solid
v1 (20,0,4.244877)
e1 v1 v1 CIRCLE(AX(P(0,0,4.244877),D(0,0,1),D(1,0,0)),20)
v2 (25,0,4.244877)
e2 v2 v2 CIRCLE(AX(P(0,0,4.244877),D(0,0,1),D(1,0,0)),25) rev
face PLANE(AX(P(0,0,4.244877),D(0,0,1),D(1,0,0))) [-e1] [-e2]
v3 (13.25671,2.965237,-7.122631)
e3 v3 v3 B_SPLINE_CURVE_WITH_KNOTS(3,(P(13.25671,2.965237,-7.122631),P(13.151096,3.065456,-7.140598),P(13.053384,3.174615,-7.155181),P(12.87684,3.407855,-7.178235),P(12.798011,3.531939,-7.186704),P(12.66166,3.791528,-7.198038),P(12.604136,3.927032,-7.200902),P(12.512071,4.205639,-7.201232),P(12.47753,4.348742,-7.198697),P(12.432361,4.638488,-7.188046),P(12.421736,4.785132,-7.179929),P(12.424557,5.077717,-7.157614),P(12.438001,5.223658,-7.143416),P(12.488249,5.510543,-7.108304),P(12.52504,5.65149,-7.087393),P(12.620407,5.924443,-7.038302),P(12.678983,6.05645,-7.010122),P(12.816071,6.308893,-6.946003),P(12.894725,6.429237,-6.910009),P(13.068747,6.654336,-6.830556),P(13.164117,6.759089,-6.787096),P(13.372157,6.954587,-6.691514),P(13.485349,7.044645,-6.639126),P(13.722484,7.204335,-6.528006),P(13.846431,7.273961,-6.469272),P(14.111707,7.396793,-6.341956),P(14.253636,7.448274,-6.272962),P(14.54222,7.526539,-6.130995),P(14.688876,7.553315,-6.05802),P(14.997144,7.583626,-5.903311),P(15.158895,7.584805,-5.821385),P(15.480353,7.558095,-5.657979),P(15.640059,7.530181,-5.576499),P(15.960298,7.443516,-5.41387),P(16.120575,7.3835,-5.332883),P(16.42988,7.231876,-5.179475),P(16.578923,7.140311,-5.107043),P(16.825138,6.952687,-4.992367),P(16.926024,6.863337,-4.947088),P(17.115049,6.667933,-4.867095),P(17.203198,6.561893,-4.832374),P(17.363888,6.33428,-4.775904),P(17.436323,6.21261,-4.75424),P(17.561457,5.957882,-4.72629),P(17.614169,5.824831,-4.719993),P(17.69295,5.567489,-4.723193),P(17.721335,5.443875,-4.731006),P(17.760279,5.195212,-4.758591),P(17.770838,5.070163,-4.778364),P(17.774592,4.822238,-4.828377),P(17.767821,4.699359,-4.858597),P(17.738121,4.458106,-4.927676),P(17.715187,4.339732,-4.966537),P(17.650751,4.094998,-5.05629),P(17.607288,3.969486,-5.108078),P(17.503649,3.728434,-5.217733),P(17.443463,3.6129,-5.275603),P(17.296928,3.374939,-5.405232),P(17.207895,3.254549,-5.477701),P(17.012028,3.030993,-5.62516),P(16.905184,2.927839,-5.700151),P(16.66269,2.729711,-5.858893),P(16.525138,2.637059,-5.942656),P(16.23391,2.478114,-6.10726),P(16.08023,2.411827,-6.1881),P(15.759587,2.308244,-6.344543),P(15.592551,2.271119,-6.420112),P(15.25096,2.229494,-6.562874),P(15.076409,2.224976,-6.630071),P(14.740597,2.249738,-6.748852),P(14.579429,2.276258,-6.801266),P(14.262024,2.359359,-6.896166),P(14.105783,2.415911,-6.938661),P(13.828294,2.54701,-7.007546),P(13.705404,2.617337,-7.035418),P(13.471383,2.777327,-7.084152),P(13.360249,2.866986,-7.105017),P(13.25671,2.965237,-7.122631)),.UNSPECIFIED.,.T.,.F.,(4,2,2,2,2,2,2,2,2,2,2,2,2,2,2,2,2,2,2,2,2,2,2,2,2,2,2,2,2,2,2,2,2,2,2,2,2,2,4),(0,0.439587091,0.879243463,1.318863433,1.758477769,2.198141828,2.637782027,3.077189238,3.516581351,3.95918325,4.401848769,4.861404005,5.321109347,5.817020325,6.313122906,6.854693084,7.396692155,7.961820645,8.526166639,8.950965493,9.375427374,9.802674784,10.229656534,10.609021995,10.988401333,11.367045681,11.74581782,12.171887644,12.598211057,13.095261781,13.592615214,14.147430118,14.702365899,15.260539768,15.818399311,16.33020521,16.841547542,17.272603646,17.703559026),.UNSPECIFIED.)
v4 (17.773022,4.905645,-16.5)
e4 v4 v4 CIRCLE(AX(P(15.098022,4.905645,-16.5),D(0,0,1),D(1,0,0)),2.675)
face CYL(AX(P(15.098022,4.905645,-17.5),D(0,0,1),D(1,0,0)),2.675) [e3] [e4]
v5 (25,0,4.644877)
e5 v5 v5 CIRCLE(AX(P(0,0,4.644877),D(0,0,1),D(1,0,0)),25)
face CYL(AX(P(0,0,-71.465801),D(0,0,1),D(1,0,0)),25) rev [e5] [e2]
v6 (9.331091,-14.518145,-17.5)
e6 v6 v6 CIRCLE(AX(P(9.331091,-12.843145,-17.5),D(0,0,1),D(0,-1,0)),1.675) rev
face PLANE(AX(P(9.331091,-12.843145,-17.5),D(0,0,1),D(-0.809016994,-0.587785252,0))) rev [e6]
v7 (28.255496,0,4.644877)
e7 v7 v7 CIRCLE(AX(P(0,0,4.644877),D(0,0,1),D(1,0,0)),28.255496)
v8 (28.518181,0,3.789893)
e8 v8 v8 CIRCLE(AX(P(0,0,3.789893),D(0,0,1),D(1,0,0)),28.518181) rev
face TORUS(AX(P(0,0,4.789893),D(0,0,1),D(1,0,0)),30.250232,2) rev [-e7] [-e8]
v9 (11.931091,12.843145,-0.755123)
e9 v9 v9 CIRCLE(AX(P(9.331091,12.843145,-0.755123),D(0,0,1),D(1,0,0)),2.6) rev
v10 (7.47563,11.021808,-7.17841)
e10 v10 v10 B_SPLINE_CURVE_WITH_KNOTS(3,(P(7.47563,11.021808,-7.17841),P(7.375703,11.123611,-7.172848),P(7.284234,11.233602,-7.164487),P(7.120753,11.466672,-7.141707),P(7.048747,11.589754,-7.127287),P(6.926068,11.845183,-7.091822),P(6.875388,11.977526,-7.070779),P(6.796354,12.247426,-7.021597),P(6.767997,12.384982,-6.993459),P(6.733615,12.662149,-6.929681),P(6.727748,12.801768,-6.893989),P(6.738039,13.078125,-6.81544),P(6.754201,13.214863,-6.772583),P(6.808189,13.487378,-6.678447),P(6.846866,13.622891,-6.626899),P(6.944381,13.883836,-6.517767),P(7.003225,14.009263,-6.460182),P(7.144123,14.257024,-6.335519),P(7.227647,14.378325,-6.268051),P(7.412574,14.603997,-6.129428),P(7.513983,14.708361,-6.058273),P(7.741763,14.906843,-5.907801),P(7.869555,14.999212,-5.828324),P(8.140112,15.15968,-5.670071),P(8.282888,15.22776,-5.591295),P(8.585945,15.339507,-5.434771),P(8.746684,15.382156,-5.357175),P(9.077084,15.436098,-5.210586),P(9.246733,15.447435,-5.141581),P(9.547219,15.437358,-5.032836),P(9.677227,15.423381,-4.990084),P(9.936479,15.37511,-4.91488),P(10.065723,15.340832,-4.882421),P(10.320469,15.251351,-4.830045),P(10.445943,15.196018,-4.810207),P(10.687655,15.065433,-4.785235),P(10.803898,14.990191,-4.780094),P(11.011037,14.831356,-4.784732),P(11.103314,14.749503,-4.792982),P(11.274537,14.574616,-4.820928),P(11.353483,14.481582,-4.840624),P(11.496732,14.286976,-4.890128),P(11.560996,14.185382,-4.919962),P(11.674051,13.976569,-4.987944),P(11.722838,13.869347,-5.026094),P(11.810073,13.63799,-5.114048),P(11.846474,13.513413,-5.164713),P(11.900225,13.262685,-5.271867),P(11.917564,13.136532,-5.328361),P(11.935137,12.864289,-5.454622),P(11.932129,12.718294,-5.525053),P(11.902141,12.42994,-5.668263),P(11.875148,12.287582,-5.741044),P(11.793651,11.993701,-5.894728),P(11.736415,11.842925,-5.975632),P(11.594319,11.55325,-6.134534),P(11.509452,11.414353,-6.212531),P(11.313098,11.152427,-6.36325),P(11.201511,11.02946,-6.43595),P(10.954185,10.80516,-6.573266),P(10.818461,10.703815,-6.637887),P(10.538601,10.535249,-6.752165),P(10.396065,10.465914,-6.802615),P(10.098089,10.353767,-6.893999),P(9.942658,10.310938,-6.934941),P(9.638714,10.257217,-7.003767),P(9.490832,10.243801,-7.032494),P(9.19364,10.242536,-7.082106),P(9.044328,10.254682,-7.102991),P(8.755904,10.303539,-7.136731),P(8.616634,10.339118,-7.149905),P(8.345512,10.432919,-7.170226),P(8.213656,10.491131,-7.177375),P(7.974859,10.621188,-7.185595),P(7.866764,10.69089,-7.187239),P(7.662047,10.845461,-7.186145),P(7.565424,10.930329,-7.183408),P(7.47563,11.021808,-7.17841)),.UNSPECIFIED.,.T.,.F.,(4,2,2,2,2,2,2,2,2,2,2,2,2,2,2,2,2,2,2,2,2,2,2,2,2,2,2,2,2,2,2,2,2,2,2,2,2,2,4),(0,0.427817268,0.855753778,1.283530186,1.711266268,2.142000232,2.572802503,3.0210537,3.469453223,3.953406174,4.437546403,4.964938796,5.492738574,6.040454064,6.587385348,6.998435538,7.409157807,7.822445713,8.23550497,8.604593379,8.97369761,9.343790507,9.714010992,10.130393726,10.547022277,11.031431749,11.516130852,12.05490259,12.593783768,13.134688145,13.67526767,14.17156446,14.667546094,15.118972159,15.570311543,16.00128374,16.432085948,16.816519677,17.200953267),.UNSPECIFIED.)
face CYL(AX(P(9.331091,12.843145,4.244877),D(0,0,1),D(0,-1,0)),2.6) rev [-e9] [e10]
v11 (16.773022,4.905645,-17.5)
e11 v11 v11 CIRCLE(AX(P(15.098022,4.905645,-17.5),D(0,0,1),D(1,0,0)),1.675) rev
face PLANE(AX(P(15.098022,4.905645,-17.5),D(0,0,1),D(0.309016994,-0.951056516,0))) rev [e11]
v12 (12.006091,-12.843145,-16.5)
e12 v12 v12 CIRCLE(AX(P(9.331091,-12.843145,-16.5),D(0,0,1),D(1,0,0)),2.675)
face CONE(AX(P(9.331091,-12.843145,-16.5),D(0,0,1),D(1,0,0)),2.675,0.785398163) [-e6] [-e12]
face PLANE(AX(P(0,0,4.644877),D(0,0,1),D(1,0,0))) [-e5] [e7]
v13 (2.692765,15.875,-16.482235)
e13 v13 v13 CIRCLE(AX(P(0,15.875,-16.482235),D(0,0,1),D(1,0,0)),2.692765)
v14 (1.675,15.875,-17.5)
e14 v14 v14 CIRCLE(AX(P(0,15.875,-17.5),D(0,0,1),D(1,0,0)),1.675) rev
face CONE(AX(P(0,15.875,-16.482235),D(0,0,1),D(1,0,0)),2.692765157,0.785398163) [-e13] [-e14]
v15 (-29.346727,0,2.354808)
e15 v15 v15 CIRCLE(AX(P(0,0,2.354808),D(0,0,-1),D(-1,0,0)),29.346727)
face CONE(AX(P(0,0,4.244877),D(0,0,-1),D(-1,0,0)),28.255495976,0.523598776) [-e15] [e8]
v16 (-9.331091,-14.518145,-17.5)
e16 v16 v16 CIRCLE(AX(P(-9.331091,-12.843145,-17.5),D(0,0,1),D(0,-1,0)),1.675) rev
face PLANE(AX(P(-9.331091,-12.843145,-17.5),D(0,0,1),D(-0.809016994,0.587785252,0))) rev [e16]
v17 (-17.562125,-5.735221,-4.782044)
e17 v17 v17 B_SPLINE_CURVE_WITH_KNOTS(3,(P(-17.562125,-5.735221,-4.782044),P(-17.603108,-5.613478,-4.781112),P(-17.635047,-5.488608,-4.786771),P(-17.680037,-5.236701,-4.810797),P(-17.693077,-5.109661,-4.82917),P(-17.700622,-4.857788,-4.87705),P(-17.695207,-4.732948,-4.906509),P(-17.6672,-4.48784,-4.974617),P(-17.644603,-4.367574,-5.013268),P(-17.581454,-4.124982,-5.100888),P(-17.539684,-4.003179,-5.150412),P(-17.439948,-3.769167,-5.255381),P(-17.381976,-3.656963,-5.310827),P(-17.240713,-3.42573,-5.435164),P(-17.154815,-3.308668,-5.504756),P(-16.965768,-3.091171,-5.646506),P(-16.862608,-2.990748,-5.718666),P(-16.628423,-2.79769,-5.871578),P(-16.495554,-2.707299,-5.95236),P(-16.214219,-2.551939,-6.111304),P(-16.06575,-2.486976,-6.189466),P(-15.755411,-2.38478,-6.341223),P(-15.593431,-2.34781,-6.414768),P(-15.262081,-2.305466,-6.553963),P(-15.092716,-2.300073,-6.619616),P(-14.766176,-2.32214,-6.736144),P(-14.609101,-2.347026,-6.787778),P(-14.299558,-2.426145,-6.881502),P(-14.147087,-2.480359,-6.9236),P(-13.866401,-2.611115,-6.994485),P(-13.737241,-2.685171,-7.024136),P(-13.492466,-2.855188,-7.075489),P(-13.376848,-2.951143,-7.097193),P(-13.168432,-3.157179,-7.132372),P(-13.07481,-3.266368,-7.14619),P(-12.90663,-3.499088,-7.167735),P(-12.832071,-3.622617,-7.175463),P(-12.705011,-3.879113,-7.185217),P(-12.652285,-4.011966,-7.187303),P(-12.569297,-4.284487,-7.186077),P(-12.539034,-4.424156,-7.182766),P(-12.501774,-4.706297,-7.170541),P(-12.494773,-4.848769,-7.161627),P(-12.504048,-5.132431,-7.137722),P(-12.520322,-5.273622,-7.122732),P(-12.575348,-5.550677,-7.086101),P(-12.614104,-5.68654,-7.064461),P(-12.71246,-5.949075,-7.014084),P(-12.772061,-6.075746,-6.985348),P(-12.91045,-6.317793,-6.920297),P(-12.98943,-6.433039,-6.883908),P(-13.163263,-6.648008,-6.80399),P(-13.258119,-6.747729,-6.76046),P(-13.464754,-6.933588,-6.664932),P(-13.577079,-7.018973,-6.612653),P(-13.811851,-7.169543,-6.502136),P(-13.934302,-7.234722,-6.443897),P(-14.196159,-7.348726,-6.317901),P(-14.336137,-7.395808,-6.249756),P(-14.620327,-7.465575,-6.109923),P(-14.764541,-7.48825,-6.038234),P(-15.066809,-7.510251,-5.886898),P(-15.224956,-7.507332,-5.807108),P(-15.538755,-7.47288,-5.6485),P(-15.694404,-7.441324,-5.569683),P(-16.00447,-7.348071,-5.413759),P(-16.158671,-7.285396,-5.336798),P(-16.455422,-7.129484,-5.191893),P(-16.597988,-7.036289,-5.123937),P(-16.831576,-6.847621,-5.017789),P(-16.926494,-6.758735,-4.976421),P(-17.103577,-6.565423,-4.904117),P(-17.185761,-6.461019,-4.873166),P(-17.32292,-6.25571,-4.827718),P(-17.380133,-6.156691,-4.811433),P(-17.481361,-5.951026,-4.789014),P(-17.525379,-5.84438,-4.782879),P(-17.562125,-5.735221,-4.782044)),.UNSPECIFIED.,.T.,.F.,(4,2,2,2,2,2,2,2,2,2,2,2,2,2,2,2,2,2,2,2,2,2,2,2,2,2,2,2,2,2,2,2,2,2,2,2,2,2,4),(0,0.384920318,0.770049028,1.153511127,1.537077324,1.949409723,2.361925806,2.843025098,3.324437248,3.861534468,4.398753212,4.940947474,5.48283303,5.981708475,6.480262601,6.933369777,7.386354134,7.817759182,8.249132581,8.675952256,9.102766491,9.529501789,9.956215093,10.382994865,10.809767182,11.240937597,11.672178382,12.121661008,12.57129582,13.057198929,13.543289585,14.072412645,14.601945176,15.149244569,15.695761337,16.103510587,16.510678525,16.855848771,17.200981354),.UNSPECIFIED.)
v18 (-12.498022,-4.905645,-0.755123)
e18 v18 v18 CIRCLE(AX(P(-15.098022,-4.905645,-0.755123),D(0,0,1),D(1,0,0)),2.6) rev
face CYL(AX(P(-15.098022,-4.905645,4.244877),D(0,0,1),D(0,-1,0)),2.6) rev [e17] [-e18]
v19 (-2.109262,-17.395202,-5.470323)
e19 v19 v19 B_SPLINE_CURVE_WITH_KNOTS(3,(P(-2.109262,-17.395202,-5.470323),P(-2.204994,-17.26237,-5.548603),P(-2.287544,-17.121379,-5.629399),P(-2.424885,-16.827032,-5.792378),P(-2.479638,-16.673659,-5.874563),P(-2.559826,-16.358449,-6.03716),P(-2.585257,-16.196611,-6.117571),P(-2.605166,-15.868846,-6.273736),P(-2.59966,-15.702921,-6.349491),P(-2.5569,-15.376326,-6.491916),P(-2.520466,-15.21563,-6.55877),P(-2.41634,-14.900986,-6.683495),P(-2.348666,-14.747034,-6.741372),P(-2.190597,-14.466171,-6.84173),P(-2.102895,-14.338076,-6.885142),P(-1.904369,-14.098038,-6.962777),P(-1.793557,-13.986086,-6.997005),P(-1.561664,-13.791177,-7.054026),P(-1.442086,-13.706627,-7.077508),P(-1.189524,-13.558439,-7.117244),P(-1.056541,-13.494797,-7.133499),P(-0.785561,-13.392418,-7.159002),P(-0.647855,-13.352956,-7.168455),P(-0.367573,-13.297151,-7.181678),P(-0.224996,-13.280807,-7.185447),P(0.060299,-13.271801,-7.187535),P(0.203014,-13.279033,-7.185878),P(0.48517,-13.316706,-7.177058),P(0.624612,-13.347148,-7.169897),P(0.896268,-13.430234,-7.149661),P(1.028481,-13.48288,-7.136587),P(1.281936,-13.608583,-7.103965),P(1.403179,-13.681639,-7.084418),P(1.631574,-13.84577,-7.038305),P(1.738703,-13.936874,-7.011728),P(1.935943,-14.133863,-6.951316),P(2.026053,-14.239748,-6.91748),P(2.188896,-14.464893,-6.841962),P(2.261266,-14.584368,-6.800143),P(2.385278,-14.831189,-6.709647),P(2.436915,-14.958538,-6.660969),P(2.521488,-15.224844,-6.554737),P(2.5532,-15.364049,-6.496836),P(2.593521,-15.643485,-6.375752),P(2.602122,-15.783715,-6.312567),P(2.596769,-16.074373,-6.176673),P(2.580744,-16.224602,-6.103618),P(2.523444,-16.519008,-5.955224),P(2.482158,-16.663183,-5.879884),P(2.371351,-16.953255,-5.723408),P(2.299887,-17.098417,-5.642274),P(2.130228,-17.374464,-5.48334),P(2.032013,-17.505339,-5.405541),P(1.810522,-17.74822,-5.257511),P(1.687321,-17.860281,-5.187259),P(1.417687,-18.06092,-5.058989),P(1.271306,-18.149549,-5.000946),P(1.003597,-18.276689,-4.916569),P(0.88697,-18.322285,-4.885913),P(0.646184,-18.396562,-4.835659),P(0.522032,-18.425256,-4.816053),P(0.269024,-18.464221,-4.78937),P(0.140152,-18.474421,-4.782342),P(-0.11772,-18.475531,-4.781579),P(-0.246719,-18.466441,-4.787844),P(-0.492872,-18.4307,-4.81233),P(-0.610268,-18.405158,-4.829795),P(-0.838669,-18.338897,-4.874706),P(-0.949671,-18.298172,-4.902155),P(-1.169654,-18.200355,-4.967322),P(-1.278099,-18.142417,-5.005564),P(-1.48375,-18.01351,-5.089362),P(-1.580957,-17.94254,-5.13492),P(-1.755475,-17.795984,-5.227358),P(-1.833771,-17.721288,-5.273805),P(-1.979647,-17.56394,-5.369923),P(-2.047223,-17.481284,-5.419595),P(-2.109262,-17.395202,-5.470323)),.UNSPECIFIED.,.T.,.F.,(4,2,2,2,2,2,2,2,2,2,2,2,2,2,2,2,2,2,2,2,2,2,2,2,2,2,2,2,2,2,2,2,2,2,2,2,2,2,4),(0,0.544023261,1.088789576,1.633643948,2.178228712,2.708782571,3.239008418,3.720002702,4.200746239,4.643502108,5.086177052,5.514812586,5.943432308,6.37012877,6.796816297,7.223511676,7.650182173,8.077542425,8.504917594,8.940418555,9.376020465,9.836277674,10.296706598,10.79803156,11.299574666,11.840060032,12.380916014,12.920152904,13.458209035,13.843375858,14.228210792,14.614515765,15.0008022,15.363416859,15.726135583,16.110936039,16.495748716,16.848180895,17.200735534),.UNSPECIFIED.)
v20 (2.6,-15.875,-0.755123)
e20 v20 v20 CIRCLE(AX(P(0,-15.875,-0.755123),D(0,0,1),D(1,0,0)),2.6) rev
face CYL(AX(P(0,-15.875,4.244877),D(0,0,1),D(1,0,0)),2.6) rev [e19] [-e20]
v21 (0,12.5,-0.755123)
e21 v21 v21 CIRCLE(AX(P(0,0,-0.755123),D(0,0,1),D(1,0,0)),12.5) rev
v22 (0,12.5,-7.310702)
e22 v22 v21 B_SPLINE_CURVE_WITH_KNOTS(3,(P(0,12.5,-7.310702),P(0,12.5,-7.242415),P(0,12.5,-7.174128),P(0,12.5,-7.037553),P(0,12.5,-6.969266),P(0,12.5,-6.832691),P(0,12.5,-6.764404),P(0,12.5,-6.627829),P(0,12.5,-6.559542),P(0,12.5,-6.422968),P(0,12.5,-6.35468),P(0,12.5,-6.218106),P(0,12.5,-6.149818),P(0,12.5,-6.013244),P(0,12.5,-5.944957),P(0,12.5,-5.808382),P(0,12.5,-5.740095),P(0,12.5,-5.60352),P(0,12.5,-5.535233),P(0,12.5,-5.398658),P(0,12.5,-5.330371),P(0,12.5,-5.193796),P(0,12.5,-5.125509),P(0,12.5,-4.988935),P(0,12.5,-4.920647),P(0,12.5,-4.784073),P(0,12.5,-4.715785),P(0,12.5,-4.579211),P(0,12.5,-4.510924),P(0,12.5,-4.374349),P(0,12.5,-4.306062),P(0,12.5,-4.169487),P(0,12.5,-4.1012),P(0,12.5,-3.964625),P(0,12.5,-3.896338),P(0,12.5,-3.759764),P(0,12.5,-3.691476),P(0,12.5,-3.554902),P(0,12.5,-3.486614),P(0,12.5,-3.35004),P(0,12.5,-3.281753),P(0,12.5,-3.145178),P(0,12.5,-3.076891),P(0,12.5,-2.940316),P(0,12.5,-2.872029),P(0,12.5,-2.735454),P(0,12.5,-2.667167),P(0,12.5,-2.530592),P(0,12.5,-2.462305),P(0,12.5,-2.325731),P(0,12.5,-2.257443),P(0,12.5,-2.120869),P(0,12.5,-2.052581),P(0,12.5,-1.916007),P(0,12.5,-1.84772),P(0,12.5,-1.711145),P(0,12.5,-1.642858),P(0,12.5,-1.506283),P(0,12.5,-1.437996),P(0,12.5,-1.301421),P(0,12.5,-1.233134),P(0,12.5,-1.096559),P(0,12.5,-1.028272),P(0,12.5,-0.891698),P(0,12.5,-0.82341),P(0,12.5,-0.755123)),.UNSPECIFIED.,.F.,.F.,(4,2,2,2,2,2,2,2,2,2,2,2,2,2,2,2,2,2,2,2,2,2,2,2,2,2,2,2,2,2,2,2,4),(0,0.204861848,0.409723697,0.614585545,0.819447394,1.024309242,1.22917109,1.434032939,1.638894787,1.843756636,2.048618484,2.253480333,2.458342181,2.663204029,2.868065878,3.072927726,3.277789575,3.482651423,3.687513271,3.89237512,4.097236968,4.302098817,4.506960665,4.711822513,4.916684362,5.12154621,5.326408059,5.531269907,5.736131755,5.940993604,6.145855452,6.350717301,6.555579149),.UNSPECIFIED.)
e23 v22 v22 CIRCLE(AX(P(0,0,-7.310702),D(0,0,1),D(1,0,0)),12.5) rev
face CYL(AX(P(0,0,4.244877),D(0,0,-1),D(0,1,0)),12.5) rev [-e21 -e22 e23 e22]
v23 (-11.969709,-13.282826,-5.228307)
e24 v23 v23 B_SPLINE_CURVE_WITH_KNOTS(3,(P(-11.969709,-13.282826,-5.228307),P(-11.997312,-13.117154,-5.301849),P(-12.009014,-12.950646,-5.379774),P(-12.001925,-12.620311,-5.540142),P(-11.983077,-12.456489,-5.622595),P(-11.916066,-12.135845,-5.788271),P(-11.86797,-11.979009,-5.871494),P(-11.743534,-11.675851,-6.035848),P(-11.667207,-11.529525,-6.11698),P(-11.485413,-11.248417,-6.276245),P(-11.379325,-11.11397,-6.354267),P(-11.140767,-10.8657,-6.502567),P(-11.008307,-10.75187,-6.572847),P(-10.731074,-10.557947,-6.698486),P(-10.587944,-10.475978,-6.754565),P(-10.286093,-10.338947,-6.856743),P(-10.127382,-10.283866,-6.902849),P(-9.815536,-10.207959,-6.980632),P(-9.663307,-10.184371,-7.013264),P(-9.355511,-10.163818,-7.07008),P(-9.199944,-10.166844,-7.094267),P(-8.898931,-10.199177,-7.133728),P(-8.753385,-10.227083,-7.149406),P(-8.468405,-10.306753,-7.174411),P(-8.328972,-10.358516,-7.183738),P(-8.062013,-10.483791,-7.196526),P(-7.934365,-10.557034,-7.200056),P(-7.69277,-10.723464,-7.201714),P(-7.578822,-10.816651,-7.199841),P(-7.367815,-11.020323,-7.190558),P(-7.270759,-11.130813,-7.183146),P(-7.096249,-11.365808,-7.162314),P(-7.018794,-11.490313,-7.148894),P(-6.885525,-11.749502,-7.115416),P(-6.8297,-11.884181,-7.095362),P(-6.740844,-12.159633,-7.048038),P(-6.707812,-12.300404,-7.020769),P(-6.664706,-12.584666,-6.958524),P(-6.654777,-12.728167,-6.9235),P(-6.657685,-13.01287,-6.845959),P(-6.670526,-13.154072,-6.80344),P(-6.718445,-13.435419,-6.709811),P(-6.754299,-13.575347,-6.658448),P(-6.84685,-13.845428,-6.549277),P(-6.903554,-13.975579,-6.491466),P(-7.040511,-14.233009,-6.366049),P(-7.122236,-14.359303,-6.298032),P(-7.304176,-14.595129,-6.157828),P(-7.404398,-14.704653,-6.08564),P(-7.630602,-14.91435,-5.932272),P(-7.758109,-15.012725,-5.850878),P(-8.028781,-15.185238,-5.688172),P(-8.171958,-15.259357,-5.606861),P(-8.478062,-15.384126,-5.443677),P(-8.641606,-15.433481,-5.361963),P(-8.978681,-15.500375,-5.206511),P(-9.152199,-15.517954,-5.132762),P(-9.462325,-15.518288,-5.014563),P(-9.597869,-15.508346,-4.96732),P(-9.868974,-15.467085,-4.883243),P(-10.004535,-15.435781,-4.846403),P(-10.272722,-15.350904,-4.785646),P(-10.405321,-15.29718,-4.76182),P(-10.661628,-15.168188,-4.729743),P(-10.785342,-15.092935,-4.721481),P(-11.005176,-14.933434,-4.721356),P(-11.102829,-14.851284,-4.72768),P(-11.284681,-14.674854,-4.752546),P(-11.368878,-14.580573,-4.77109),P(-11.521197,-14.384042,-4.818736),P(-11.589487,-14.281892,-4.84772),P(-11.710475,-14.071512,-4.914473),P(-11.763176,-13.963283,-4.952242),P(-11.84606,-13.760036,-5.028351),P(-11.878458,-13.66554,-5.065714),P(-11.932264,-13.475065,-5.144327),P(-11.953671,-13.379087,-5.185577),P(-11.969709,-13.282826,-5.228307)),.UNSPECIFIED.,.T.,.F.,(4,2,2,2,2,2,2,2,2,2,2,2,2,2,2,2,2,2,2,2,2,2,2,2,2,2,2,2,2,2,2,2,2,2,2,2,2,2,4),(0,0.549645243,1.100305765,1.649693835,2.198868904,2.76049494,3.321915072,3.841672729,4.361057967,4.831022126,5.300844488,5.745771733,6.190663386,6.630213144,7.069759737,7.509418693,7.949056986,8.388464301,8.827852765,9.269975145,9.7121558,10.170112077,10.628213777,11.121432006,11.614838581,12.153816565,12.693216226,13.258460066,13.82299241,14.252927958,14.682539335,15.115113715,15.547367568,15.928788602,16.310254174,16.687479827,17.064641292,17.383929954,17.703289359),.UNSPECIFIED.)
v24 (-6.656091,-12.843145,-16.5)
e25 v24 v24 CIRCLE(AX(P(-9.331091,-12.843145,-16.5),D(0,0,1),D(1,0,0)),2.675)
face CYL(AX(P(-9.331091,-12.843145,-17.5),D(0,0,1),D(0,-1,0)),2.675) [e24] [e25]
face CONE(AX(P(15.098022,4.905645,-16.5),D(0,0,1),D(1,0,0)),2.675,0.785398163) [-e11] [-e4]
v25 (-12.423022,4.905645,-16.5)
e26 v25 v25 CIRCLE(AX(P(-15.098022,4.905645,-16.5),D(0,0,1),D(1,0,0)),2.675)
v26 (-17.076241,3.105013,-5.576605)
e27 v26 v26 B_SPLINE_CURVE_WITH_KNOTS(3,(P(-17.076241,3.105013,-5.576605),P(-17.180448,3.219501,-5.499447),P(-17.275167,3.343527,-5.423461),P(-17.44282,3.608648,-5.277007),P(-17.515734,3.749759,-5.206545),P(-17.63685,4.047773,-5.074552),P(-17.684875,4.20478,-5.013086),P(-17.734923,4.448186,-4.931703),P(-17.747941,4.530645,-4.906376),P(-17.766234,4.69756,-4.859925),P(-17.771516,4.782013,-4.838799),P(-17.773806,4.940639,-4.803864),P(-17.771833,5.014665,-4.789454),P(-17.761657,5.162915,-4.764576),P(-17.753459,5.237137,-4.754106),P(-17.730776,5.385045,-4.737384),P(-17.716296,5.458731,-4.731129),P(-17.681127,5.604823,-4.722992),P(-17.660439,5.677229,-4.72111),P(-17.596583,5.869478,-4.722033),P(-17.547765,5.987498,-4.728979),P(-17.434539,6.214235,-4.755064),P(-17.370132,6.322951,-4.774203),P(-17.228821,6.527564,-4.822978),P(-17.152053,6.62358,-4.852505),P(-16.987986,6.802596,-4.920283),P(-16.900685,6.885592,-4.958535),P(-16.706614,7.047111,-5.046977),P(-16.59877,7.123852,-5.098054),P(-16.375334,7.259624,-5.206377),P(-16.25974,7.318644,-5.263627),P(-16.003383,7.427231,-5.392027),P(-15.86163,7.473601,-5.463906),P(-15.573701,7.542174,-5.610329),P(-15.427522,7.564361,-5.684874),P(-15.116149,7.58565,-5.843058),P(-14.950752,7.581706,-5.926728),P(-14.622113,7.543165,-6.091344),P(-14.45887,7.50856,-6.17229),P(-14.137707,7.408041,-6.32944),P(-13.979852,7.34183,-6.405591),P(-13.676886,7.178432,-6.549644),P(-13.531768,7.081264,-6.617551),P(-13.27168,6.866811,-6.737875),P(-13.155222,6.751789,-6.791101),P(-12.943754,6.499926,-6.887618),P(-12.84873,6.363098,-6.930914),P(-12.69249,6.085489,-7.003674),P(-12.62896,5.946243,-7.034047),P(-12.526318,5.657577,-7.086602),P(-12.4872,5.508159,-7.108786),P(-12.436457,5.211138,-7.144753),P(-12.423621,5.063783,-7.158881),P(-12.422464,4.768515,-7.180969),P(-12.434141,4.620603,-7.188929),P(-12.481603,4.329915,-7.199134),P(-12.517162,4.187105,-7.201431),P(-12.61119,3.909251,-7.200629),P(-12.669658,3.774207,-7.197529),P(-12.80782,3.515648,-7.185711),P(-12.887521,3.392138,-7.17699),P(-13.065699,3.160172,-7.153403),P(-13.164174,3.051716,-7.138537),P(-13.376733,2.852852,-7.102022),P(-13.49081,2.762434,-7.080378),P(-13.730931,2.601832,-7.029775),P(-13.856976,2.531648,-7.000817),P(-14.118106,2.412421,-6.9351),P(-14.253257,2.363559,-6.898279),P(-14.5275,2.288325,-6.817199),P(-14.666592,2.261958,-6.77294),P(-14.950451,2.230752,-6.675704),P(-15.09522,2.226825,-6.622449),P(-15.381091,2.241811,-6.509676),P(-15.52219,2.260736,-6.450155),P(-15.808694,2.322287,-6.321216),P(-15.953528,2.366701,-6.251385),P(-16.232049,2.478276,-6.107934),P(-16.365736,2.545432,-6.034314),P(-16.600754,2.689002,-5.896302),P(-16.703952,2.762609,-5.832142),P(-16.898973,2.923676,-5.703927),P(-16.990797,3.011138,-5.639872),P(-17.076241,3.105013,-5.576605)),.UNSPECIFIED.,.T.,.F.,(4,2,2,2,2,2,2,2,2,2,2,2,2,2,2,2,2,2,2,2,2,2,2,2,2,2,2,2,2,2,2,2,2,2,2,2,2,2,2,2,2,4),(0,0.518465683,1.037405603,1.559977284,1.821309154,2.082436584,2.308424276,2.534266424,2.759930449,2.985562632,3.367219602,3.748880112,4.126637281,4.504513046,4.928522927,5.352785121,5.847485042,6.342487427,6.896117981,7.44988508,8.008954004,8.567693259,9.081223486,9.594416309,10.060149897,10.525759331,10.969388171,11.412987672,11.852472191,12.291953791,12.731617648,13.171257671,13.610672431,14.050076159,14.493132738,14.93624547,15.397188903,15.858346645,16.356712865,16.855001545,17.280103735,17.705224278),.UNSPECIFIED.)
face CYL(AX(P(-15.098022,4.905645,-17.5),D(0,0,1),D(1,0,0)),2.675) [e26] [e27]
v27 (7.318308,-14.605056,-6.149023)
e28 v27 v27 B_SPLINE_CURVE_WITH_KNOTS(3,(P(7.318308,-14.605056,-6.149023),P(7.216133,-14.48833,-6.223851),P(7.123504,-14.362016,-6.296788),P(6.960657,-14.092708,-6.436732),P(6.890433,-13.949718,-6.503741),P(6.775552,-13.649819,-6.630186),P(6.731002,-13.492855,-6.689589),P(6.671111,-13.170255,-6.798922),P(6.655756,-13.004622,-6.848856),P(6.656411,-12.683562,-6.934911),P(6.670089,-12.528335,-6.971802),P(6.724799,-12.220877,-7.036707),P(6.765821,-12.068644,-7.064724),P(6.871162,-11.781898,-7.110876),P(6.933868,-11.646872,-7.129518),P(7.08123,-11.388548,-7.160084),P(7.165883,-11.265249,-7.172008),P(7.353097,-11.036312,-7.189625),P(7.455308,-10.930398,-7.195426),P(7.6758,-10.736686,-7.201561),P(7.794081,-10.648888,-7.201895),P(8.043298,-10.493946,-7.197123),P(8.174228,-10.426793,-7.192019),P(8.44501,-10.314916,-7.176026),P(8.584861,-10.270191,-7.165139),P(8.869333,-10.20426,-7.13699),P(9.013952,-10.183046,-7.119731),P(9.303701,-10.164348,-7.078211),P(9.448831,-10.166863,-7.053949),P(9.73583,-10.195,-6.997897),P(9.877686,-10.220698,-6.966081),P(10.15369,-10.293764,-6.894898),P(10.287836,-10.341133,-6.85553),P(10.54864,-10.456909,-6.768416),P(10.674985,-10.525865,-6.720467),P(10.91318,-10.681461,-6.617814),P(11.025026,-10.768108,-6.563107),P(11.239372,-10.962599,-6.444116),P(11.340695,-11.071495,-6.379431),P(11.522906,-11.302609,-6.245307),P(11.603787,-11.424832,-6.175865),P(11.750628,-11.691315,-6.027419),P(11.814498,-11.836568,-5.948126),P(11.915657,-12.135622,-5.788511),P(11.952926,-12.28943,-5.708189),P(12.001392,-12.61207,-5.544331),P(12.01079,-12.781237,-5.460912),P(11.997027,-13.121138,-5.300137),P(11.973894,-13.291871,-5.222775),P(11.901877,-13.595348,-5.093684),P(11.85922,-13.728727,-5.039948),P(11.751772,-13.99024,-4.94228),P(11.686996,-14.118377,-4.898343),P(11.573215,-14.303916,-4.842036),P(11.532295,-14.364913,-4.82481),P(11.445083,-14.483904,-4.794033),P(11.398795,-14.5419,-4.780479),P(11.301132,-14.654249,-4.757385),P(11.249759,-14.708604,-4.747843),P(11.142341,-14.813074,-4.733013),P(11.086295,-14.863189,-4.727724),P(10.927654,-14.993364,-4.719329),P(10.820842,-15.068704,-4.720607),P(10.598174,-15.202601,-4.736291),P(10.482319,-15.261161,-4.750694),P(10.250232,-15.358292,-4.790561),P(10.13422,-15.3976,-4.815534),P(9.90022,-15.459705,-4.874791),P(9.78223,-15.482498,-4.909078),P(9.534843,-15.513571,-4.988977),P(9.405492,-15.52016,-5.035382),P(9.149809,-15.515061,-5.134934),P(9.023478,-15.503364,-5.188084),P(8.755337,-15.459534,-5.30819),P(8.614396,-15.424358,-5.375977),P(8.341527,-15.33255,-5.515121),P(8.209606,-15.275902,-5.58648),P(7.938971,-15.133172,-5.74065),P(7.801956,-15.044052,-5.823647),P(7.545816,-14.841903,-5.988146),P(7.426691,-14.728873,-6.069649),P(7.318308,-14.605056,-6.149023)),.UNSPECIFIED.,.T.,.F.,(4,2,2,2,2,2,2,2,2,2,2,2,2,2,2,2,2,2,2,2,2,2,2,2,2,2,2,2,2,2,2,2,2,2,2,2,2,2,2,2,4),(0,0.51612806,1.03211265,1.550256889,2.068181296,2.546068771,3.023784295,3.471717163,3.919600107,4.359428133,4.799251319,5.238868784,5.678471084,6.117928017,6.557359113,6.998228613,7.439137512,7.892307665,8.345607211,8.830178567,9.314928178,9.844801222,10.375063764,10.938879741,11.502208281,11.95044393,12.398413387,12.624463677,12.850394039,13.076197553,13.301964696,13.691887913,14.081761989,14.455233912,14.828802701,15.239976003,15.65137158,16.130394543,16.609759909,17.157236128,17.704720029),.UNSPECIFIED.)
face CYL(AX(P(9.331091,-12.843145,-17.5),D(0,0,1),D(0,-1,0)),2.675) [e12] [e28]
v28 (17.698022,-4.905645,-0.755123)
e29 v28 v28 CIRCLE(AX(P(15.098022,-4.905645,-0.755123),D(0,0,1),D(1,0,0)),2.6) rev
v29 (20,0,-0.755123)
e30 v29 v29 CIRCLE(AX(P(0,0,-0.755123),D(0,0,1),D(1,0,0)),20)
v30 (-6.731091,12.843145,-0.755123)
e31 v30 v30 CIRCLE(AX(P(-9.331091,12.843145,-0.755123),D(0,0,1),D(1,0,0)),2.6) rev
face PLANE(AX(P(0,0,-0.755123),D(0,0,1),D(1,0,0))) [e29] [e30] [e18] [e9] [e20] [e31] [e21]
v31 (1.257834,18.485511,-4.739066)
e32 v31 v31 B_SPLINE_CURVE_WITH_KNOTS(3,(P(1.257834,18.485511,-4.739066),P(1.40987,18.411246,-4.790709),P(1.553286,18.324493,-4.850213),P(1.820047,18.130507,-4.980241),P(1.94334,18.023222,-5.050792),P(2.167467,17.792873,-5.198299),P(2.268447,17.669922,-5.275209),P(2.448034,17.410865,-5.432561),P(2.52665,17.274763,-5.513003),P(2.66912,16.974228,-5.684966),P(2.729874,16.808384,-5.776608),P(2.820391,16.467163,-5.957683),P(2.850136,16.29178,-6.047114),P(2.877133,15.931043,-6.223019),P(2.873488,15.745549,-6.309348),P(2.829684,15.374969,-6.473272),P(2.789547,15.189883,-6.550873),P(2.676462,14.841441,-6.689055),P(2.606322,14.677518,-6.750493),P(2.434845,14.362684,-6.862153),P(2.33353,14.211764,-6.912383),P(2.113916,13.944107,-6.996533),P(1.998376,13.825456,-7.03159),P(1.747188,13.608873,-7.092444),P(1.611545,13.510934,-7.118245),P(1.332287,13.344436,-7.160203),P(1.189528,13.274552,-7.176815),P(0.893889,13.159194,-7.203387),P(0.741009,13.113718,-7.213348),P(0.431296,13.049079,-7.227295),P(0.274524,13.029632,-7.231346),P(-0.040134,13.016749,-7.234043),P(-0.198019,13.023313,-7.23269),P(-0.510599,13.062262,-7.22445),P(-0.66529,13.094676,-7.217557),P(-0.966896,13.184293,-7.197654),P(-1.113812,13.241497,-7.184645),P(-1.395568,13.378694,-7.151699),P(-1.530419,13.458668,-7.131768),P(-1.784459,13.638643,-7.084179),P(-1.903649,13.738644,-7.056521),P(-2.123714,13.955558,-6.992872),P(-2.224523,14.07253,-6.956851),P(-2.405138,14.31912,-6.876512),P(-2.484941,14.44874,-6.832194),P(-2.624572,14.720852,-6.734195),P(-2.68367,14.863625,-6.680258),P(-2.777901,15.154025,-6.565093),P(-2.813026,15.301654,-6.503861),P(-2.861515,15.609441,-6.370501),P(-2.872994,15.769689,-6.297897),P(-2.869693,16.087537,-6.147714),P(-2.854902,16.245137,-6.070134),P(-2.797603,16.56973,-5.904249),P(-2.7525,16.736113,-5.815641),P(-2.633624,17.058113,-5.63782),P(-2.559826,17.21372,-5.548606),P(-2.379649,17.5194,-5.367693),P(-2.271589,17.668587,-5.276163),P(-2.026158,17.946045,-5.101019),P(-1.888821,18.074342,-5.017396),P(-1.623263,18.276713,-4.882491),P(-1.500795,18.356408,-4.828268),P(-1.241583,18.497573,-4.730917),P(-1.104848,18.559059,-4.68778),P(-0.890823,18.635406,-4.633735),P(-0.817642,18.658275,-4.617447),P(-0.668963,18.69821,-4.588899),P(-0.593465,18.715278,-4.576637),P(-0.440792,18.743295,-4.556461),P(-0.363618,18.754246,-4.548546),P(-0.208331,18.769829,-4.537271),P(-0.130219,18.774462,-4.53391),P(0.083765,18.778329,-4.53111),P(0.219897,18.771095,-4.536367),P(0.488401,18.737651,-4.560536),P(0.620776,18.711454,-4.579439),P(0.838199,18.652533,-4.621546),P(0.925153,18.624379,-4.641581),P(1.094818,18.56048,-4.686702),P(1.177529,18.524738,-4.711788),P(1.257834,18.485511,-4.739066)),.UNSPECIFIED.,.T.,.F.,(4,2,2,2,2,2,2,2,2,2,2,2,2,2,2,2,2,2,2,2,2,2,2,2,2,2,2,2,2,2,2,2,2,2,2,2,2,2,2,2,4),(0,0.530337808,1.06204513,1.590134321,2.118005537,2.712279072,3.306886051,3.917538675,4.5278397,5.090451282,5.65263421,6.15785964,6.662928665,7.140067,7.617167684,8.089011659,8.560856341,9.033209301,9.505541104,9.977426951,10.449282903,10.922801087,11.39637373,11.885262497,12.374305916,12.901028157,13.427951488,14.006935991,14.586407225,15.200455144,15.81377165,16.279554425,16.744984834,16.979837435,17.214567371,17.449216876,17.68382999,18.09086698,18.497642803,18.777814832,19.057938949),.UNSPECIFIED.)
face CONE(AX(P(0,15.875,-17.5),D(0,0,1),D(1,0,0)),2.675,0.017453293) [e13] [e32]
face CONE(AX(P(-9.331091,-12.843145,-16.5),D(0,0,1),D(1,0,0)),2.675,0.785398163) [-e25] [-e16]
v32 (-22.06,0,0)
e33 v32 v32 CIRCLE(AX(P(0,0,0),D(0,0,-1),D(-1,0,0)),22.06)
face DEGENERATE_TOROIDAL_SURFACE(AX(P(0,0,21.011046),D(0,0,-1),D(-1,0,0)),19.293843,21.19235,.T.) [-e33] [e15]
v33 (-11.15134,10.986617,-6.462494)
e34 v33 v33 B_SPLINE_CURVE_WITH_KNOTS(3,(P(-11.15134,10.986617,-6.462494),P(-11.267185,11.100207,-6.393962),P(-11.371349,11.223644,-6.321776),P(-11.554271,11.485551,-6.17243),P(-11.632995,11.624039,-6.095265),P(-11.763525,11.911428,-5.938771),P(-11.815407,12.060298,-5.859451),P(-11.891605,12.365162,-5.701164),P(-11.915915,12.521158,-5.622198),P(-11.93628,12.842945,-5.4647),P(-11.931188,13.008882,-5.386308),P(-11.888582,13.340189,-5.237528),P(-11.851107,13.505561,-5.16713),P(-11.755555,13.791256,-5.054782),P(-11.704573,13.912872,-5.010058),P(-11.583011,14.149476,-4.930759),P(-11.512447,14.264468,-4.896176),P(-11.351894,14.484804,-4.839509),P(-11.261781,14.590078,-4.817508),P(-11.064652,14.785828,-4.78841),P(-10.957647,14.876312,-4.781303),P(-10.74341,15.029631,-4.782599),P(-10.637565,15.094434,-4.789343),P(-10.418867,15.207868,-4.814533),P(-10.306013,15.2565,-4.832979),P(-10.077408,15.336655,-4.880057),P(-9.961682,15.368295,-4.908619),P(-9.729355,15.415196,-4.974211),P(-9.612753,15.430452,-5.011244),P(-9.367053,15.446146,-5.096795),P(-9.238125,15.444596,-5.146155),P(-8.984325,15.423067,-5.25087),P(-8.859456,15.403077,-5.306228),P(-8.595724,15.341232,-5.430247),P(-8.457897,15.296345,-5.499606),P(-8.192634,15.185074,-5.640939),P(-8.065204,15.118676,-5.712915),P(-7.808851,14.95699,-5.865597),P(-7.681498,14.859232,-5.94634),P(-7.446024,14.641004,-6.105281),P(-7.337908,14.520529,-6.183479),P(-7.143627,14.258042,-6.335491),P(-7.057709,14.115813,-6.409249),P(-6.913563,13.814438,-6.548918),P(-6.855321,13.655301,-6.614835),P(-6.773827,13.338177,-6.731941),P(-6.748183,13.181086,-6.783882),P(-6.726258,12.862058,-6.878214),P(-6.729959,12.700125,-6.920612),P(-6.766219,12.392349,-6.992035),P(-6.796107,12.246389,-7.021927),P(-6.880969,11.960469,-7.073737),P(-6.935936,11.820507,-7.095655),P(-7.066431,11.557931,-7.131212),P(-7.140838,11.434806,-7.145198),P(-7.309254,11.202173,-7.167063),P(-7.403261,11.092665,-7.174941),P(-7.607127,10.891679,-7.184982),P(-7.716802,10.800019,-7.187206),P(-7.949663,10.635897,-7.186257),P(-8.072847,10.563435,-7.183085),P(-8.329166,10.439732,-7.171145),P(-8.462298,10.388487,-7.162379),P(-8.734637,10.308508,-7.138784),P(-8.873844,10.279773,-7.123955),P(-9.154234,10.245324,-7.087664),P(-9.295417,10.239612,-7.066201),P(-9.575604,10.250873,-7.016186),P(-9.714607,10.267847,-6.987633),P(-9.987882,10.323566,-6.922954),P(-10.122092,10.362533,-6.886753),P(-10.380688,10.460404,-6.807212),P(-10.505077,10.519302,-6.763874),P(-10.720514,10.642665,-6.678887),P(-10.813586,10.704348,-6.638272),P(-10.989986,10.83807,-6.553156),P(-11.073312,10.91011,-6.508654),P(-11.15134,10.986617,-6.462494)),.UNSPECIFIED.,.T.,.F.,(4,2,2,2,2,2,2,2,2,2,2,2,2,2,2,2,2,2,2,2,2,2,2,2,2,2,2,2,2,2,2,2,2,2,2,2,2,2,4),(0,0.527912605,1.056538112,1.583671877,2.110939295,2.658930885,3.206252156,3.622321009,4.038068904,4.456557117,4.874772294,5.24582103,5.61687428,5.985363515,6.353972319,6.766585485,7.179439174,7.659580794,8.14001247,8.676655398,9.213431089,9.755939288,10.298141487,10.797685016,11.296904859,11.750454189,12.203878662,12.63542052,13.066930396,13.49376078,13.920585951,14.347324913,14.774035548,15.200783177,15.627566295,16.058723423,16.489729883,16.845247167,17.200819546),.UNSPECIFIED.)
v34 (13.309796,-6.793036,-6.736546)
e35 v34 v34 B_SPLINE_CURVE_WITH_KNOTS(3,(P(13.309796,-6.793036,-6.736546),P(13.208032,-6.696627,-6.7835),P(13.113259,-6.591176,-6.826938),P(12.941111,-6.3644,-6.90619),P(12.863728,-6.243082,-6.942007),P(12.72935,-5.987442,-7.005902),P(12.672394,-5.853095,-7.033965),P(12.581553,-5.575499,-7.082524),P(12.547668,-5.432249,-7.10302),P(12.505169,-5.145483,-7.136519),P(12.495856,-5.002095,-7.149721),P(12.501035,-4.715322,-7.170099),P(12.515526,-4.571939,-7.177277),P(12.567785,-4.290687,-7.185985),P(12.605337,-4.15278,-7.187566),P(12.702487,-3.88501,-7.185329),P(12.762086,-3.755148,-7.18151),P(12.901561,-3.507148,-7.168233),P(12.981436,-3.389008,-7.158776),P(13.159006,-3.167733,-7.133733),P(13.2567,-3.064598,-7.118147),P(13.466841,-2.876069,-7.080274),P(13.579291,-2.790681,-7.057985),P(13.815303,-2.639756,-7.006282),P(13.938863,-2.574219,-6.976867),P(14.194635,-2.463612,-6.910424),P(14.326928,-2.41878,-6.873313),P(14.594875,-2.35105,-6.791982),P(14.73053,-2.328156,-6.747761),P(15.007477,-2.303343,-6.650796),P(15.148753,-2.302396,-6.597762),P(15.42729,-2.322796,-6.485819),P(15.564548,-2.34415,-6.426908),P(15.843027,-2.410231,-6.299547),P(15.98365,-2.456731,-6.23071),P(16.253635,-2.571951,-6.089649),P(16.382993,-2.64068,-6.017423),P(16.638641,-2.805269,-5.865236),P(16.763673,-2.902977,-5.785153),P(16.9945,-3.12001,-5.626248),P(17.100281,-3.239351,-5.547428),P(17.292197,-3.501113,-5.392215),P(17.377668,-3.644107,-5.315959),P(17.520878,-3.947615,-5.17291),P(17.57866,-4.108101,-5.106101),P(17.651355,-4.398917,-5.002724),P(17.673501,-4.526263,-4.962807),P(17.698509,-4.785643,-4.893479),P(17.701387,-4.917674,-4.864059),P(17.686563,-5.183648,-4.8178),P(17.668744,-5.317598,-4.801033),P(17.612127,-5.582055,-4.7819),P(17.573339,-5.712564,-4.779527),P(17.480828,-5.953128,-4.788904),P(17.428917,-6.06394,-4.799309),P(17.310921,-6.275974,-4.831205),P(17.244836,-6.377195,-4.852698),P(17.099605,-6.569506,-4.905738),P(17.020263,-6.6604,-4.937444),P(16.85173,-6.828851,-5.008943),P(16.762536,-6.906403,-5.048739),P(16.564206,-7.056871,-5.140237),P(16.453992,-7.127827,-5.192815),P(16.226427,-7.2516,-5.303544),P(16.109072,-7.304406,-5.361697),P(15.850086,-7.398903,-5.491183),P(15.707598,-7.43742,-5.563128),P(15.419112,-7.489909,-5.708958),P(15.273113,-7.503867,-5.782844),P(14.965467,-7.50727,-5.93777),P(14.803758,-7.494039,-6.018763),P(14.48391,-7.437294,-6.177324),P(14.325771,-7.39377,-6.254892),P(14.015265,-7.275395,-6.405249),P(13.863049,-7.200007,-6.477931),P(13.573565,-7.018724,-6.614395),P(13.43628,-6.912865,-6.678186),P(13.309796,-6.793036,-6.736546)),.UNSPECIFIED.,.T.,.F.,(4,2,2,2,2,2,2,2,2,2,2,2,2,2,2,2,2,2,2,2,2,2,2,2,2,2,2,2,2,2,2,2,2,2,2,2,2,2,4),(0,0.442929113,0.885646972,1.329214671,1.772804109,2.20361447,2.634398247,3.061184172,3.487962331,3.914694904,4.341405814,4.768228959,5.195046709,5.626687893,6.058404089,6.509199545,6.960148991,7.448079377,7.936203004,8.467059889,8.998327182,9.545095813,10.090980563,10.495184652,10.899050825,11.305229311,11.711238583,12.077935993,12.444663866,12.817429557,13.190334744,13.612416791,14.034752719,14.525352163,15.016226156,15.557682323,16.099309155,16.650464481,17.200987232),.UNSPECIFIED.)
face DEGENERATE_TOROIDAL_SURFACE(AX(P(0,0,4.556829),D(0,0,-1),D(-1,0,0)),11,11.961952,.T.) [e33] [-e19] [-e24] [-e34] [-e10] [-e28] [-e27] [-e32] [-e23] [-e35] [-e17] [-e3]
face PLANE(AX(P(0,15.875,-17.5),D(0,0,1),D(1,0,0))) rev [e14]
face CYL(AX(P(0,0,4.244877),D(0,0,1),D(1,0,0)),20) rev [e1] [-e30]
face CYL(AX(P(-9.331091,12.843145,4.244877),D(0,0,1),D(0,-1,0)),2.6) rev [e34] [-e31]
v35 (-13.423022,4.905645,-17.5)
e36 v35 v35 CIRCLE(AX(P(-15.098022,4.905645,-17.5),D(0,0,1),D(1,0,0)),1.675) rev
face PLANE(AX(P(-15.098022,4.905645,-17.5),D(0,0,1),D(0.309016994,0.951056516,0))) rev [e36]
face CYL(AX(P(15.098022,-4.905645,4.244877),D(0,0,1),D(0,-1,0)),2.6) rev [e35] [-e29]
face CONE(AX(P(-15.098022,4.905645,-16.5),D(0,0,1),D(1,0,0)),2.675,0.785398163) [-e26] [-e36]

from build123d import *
from build123d.topology import SkipClean

# Parameters (mm, degrees)
SKETCH_10_R             = 2.675
EXTRUDE_5_DEPTH         = 17.5
CHAMFER1_SIZE           = 1
CHAMFER1_SIZE2          = 1.017920191
SKETCH_4_R              = 12.5
CUT_EXTRUDE_1_DEPTH     = 44.106650761
HOLE_WIZARD_M5_1_D      = 5.2
CIRPATTERN1_START       = -7.186794992
CIRPATTERN1_5_OUTLINE_R = 2.6
CIRPATTERN1_5_DEPTH     = 11.431671907
SKETCH_14_W             = 5
SKETCH_14_H             = 20
BOSS_EXTRUDE1_START     = 0.4
SKETCH1_R               = 28.255495976
SKETCH1_R_2             = 20
BOSS_EXTRUDE1_DEPTH     = 0.4
SKETCH4_R               = 25
CUT_EXTRUDE3_DEPTH      = 0.4
FILLET1_R               = 2


# Read off the part's stored shape, not the designer's step: 구배1, CirPattern1
with BuildPart() as part:
    # 스케치7 → 회전2 (revolve)
    with BuildSketch(Plane.ZY, mode=Mode.PRIVATE) as revolve_2_sk:
        with BuildLine():
            ThreePointArc((2.354808499, 29.346727485), (0.845544662, 25.810608837), (0, 22.06))
            Line((0, 22.06), (4.244876915, 22.06))
            Line((4.244876915, 22.06), (4.244876915, 28.255495976))
            Line((4.244876915, 28.255495976), (2.354808499, 29.346727485))
        make_face()
        with BuildLine():
            Line((-7.405123085, 11), (-7.405123085, 0))
            Line((-7.405123085, 0), (4.244876915, 0))
            Line((4.244876915, 0), (4.244876915, 22.06))
            Line((4.244876915, 22.06), (0, 22.06))
            ThreePointArc((0, 22.06), (-5.382911125, 17.655062883), (-7.405123085, 11))
        make_face()
    revolve(revolve_2_sk.sketch.rotate(Axis((0, 0, -7.405123085), (0, 0, 1)), 90), axis=Axis((0, 0, -7.405123085), (0, 0, 1)))

    # 스케치10 → 보스-돌출5 (add)
    with BuildSketch(Plane.XY):
        with Locations((0, 15.875)):
            Circle(SKETCH_10_R)
    extrude(amount=-EXTRUDE_5_DEPTH)

    # 구배1 outline → 구배1 (revolve)
    with BuildSketch(Plane.XZ.offset(-15.875)):
        Polygon((2.675, -17.5), (2.901355148, -4.532122261), (2.675, -4.532122261), align=None)
    revolve(axis=Axis((0, 15.875, 0), (0, 0, 1)))

    # Chamfer1
    chamfer1_edges = [part.edges().sort_by_distance(p)[0] for p in [
        (-2.675, 15.875, -17.5),
    ]]
    chamfer1_side = [part.faces().sort_by_distance(p)[0] for p in [
        (0, 15.875, -17.5),
    ]]
    chamfer(chamfer1_edges, length=CHAMFER1_SIZE, length2=CHAMFER1_SIZE2, reference=chamfer1_side[0])

    # 스케치4 → 컷-돌출1 (cut, through all)
    with BuildSketch(Plane(origin=(0, 0, -7.405123085), x_dir=(-1, 0, 0), z_dir=(0, 0, -1))):
        with Locations(Location((0, 0, 0), (0, 0, 90))):
            Circle(SKETCH_4_R)
    extrude(amount=-CUT_EXTRUDE_1_DEPTH, mode=Mode.SUBTRACT)

    # M5 나선 코일용 탭 드릴1 (through all)
    with Locations(Plane.XY.offset(4.244876915)):
        with Locations((0, -15.875)):
            Hole(HOLE_WIZARD_M5_1_D / 2)

    # CirPattern1 outline → CirPattern1 (revolve)
    with BuildSketch(Plane(origin=(15.098022196, 4.905644786, 0), x_dir=(1, 0, 0), z_dir=(0, -1, 0))):
        Polygon((0, -4.72112791), (0, -17.5), (1.675, -17.5), (2.675, -16.5), (2.675, -4.72112791), align=None)
    revolve(axis=Axis((15.098022196, 4.905644786, 0), (0, 0, 1)))

    # CirPattern1 2 outline → CirPattern1 2 (revolve)
    with BuildSketch(Plane(origin=(9.33109088, -12.843144786, 0), x_dir=(1, 0, 0), z_dir=(0, -1, 0))):
        Polygon((0, -4.721045305), (0, -17.5), (1.675, -17.5), (2.675, -16.5), (2.675, -4.721045305), align=None)
    revolve(axis=Axis((9.33109088, -12.843144786, 0), (0, 0, 1)))

    # CirPattern1 3 outline → CirPattern1 3 (revolve)
    with BuildSketch(Plane(origin=(-9.33109088, -12.843144786, 0), x_dir=(1, 0, 0), z_dir=(0, -1, 0))):
        Polygon((0, -4.72095341), (0, -17.5), (1.675, -17.5), (2.675, -16.5), (2.675, -4.72095341), align=None)
    revolve(axis=Axis((-9.33109088, -12.843144786, 0), (0, 0, 1)))

    # CirPattern1 4 outline → CirPattern1 4 (revolve)
    with BuildSketch(Plane(origin=(-15.098022196, 4.905644786, 0), x_dir=(1, 0, 0), z_dir=(0, -1, 0))):
        Polygon((0, -4.721296369), (0, -17.5), (1.675, -17.5), (2.675, -16.5), (2.675, -4.721296369), align=None)
    revolve(axis=Axis((-15.098022196, 4.905644786, 0), (0, 0, 1)))

    # CirPattern1 5 outline → CirPattern1 5 (cut)
    with BuildSketch(Plane.XY.offset(CIRPATTERN1_START)):
        with Locations((-15.098022196, -4.905644786)):
            Circle(CIRPATTERN1_5_OUTLINE_R)
        with Locations((-9.33109088, 12.843144786)):
            Circle(CIRPATTERN1_5_OUTLINE_R)
        with Locations((9.33109088, 12.843144786)):
            Circle(CIRPATTERN1_5_OUTLINE_R)
        with Locations((15.098022196, -4.905644786)):
            Circle(CIRPATTERN1_5_OUTLINE_R)
    extrude(amount=CIRPATTERN1_5_DEPTH, mode=Mode.SUBTRACT)

    # 스케치14 → 컷-회전1 (revolve, cut)
    with BuildSketch(Plane(origin=(0, 0, 0), x_dir=(0, 0, -1), z_dir=(1, 0, 0))):
        with Locations((-1.744876915, 10)):
            Rectangle(SKETCH_14_W, SKETCH_14_H)
    revolve(axis=Axis((0, 0, 4.244876915), (0, 0, -1)), mode=Mode.SUBTRACT)

    # Sketch1 → Boss-Extrude1 (add)
    with SkipClean():  # the faces are left unmerged after this step: merging them gives an invalid solid
        with BuildSketch(Plane.XY.offset(4.244876915).offset(BOSS_EXTRUDE1_START)):
            Circle(SKETCH1_R)
            Circle(SKETCH1_R_2, mode=Mode.SUBTRACT)
        extrude(amount=-BOSS_EXTRUDE1_DEPTH)

    # Sketch4 → Cut-Extrude3 (cut)
    with BuildSketch(Plane.XY.offset(4.644876915)):
        Circle(SKETCH4_R)
    extrude(amount=-CUT_EXTRUDE3_DEPTH, mode=Mode.SUBTRACT)

    # Fillet1
    # the kernel refuses this fillet: 2 mm, written as the material it adds along each edge
    with BuildSketch(Plane(origin=(0, 0, 4.244876915), x_dir=(-1, 0, 0), z_dir=(0, 1, 0))) as fillet1_piece_1:
        with BuildLine():
            CenterArc((30.250231597, 0.545016556), FILLET1_R, 184.158067237, 25.841932763)
            Line((28.518180789, -0.454983444), (28.483539773, -0.474983444))
            Line((28.483539773, -0.474983444), (28.22085496, -0.02))
            Line((28.22085496, -0.02), (28.215495976, 0))
            ThreePointArc((28.215495976, 0), (28.215495976, 0.2), (28.215601263, 0.397099669))
            Line((28.215601263, 0.397099669), (28.255495976, 0.4))
        make_face()
    revolve(axis=Axis((0, 0, 4.244876915), (0, 0, 1)), revolution_arc=180)
    with BuildSketch(Plane(origin=(0, 0, 4.244876915), x_dir=(1, 0, 0), z_dir=(0, -1, 0))) as fillet1_piece_2:
        with BuildLine():
            CenterArc((30.250231597, 0.545016556), FILLET1_R, 184.158067237, 25.841932763)
            Line((28.518180789, -0.454983444), (28.483539773, -0.474983444))
            Line((28.483539773, -0.474983444), (28.22085496, -0.02))
            Line((28.22085496, -0.02), (28.215495976, 0))
            ThreePointArc((28.215495976, 0), (28.215495976, 0.2), (28.215601263, 0.397099669))
            Line((28.215601263, 0.397099669), (28.255495976, 0.4))
        make_face()
    revolve(axis=Axis((0, 0, 4.244876915), (0, 0, 1)), revolution_arc=180)


solid = part.part
